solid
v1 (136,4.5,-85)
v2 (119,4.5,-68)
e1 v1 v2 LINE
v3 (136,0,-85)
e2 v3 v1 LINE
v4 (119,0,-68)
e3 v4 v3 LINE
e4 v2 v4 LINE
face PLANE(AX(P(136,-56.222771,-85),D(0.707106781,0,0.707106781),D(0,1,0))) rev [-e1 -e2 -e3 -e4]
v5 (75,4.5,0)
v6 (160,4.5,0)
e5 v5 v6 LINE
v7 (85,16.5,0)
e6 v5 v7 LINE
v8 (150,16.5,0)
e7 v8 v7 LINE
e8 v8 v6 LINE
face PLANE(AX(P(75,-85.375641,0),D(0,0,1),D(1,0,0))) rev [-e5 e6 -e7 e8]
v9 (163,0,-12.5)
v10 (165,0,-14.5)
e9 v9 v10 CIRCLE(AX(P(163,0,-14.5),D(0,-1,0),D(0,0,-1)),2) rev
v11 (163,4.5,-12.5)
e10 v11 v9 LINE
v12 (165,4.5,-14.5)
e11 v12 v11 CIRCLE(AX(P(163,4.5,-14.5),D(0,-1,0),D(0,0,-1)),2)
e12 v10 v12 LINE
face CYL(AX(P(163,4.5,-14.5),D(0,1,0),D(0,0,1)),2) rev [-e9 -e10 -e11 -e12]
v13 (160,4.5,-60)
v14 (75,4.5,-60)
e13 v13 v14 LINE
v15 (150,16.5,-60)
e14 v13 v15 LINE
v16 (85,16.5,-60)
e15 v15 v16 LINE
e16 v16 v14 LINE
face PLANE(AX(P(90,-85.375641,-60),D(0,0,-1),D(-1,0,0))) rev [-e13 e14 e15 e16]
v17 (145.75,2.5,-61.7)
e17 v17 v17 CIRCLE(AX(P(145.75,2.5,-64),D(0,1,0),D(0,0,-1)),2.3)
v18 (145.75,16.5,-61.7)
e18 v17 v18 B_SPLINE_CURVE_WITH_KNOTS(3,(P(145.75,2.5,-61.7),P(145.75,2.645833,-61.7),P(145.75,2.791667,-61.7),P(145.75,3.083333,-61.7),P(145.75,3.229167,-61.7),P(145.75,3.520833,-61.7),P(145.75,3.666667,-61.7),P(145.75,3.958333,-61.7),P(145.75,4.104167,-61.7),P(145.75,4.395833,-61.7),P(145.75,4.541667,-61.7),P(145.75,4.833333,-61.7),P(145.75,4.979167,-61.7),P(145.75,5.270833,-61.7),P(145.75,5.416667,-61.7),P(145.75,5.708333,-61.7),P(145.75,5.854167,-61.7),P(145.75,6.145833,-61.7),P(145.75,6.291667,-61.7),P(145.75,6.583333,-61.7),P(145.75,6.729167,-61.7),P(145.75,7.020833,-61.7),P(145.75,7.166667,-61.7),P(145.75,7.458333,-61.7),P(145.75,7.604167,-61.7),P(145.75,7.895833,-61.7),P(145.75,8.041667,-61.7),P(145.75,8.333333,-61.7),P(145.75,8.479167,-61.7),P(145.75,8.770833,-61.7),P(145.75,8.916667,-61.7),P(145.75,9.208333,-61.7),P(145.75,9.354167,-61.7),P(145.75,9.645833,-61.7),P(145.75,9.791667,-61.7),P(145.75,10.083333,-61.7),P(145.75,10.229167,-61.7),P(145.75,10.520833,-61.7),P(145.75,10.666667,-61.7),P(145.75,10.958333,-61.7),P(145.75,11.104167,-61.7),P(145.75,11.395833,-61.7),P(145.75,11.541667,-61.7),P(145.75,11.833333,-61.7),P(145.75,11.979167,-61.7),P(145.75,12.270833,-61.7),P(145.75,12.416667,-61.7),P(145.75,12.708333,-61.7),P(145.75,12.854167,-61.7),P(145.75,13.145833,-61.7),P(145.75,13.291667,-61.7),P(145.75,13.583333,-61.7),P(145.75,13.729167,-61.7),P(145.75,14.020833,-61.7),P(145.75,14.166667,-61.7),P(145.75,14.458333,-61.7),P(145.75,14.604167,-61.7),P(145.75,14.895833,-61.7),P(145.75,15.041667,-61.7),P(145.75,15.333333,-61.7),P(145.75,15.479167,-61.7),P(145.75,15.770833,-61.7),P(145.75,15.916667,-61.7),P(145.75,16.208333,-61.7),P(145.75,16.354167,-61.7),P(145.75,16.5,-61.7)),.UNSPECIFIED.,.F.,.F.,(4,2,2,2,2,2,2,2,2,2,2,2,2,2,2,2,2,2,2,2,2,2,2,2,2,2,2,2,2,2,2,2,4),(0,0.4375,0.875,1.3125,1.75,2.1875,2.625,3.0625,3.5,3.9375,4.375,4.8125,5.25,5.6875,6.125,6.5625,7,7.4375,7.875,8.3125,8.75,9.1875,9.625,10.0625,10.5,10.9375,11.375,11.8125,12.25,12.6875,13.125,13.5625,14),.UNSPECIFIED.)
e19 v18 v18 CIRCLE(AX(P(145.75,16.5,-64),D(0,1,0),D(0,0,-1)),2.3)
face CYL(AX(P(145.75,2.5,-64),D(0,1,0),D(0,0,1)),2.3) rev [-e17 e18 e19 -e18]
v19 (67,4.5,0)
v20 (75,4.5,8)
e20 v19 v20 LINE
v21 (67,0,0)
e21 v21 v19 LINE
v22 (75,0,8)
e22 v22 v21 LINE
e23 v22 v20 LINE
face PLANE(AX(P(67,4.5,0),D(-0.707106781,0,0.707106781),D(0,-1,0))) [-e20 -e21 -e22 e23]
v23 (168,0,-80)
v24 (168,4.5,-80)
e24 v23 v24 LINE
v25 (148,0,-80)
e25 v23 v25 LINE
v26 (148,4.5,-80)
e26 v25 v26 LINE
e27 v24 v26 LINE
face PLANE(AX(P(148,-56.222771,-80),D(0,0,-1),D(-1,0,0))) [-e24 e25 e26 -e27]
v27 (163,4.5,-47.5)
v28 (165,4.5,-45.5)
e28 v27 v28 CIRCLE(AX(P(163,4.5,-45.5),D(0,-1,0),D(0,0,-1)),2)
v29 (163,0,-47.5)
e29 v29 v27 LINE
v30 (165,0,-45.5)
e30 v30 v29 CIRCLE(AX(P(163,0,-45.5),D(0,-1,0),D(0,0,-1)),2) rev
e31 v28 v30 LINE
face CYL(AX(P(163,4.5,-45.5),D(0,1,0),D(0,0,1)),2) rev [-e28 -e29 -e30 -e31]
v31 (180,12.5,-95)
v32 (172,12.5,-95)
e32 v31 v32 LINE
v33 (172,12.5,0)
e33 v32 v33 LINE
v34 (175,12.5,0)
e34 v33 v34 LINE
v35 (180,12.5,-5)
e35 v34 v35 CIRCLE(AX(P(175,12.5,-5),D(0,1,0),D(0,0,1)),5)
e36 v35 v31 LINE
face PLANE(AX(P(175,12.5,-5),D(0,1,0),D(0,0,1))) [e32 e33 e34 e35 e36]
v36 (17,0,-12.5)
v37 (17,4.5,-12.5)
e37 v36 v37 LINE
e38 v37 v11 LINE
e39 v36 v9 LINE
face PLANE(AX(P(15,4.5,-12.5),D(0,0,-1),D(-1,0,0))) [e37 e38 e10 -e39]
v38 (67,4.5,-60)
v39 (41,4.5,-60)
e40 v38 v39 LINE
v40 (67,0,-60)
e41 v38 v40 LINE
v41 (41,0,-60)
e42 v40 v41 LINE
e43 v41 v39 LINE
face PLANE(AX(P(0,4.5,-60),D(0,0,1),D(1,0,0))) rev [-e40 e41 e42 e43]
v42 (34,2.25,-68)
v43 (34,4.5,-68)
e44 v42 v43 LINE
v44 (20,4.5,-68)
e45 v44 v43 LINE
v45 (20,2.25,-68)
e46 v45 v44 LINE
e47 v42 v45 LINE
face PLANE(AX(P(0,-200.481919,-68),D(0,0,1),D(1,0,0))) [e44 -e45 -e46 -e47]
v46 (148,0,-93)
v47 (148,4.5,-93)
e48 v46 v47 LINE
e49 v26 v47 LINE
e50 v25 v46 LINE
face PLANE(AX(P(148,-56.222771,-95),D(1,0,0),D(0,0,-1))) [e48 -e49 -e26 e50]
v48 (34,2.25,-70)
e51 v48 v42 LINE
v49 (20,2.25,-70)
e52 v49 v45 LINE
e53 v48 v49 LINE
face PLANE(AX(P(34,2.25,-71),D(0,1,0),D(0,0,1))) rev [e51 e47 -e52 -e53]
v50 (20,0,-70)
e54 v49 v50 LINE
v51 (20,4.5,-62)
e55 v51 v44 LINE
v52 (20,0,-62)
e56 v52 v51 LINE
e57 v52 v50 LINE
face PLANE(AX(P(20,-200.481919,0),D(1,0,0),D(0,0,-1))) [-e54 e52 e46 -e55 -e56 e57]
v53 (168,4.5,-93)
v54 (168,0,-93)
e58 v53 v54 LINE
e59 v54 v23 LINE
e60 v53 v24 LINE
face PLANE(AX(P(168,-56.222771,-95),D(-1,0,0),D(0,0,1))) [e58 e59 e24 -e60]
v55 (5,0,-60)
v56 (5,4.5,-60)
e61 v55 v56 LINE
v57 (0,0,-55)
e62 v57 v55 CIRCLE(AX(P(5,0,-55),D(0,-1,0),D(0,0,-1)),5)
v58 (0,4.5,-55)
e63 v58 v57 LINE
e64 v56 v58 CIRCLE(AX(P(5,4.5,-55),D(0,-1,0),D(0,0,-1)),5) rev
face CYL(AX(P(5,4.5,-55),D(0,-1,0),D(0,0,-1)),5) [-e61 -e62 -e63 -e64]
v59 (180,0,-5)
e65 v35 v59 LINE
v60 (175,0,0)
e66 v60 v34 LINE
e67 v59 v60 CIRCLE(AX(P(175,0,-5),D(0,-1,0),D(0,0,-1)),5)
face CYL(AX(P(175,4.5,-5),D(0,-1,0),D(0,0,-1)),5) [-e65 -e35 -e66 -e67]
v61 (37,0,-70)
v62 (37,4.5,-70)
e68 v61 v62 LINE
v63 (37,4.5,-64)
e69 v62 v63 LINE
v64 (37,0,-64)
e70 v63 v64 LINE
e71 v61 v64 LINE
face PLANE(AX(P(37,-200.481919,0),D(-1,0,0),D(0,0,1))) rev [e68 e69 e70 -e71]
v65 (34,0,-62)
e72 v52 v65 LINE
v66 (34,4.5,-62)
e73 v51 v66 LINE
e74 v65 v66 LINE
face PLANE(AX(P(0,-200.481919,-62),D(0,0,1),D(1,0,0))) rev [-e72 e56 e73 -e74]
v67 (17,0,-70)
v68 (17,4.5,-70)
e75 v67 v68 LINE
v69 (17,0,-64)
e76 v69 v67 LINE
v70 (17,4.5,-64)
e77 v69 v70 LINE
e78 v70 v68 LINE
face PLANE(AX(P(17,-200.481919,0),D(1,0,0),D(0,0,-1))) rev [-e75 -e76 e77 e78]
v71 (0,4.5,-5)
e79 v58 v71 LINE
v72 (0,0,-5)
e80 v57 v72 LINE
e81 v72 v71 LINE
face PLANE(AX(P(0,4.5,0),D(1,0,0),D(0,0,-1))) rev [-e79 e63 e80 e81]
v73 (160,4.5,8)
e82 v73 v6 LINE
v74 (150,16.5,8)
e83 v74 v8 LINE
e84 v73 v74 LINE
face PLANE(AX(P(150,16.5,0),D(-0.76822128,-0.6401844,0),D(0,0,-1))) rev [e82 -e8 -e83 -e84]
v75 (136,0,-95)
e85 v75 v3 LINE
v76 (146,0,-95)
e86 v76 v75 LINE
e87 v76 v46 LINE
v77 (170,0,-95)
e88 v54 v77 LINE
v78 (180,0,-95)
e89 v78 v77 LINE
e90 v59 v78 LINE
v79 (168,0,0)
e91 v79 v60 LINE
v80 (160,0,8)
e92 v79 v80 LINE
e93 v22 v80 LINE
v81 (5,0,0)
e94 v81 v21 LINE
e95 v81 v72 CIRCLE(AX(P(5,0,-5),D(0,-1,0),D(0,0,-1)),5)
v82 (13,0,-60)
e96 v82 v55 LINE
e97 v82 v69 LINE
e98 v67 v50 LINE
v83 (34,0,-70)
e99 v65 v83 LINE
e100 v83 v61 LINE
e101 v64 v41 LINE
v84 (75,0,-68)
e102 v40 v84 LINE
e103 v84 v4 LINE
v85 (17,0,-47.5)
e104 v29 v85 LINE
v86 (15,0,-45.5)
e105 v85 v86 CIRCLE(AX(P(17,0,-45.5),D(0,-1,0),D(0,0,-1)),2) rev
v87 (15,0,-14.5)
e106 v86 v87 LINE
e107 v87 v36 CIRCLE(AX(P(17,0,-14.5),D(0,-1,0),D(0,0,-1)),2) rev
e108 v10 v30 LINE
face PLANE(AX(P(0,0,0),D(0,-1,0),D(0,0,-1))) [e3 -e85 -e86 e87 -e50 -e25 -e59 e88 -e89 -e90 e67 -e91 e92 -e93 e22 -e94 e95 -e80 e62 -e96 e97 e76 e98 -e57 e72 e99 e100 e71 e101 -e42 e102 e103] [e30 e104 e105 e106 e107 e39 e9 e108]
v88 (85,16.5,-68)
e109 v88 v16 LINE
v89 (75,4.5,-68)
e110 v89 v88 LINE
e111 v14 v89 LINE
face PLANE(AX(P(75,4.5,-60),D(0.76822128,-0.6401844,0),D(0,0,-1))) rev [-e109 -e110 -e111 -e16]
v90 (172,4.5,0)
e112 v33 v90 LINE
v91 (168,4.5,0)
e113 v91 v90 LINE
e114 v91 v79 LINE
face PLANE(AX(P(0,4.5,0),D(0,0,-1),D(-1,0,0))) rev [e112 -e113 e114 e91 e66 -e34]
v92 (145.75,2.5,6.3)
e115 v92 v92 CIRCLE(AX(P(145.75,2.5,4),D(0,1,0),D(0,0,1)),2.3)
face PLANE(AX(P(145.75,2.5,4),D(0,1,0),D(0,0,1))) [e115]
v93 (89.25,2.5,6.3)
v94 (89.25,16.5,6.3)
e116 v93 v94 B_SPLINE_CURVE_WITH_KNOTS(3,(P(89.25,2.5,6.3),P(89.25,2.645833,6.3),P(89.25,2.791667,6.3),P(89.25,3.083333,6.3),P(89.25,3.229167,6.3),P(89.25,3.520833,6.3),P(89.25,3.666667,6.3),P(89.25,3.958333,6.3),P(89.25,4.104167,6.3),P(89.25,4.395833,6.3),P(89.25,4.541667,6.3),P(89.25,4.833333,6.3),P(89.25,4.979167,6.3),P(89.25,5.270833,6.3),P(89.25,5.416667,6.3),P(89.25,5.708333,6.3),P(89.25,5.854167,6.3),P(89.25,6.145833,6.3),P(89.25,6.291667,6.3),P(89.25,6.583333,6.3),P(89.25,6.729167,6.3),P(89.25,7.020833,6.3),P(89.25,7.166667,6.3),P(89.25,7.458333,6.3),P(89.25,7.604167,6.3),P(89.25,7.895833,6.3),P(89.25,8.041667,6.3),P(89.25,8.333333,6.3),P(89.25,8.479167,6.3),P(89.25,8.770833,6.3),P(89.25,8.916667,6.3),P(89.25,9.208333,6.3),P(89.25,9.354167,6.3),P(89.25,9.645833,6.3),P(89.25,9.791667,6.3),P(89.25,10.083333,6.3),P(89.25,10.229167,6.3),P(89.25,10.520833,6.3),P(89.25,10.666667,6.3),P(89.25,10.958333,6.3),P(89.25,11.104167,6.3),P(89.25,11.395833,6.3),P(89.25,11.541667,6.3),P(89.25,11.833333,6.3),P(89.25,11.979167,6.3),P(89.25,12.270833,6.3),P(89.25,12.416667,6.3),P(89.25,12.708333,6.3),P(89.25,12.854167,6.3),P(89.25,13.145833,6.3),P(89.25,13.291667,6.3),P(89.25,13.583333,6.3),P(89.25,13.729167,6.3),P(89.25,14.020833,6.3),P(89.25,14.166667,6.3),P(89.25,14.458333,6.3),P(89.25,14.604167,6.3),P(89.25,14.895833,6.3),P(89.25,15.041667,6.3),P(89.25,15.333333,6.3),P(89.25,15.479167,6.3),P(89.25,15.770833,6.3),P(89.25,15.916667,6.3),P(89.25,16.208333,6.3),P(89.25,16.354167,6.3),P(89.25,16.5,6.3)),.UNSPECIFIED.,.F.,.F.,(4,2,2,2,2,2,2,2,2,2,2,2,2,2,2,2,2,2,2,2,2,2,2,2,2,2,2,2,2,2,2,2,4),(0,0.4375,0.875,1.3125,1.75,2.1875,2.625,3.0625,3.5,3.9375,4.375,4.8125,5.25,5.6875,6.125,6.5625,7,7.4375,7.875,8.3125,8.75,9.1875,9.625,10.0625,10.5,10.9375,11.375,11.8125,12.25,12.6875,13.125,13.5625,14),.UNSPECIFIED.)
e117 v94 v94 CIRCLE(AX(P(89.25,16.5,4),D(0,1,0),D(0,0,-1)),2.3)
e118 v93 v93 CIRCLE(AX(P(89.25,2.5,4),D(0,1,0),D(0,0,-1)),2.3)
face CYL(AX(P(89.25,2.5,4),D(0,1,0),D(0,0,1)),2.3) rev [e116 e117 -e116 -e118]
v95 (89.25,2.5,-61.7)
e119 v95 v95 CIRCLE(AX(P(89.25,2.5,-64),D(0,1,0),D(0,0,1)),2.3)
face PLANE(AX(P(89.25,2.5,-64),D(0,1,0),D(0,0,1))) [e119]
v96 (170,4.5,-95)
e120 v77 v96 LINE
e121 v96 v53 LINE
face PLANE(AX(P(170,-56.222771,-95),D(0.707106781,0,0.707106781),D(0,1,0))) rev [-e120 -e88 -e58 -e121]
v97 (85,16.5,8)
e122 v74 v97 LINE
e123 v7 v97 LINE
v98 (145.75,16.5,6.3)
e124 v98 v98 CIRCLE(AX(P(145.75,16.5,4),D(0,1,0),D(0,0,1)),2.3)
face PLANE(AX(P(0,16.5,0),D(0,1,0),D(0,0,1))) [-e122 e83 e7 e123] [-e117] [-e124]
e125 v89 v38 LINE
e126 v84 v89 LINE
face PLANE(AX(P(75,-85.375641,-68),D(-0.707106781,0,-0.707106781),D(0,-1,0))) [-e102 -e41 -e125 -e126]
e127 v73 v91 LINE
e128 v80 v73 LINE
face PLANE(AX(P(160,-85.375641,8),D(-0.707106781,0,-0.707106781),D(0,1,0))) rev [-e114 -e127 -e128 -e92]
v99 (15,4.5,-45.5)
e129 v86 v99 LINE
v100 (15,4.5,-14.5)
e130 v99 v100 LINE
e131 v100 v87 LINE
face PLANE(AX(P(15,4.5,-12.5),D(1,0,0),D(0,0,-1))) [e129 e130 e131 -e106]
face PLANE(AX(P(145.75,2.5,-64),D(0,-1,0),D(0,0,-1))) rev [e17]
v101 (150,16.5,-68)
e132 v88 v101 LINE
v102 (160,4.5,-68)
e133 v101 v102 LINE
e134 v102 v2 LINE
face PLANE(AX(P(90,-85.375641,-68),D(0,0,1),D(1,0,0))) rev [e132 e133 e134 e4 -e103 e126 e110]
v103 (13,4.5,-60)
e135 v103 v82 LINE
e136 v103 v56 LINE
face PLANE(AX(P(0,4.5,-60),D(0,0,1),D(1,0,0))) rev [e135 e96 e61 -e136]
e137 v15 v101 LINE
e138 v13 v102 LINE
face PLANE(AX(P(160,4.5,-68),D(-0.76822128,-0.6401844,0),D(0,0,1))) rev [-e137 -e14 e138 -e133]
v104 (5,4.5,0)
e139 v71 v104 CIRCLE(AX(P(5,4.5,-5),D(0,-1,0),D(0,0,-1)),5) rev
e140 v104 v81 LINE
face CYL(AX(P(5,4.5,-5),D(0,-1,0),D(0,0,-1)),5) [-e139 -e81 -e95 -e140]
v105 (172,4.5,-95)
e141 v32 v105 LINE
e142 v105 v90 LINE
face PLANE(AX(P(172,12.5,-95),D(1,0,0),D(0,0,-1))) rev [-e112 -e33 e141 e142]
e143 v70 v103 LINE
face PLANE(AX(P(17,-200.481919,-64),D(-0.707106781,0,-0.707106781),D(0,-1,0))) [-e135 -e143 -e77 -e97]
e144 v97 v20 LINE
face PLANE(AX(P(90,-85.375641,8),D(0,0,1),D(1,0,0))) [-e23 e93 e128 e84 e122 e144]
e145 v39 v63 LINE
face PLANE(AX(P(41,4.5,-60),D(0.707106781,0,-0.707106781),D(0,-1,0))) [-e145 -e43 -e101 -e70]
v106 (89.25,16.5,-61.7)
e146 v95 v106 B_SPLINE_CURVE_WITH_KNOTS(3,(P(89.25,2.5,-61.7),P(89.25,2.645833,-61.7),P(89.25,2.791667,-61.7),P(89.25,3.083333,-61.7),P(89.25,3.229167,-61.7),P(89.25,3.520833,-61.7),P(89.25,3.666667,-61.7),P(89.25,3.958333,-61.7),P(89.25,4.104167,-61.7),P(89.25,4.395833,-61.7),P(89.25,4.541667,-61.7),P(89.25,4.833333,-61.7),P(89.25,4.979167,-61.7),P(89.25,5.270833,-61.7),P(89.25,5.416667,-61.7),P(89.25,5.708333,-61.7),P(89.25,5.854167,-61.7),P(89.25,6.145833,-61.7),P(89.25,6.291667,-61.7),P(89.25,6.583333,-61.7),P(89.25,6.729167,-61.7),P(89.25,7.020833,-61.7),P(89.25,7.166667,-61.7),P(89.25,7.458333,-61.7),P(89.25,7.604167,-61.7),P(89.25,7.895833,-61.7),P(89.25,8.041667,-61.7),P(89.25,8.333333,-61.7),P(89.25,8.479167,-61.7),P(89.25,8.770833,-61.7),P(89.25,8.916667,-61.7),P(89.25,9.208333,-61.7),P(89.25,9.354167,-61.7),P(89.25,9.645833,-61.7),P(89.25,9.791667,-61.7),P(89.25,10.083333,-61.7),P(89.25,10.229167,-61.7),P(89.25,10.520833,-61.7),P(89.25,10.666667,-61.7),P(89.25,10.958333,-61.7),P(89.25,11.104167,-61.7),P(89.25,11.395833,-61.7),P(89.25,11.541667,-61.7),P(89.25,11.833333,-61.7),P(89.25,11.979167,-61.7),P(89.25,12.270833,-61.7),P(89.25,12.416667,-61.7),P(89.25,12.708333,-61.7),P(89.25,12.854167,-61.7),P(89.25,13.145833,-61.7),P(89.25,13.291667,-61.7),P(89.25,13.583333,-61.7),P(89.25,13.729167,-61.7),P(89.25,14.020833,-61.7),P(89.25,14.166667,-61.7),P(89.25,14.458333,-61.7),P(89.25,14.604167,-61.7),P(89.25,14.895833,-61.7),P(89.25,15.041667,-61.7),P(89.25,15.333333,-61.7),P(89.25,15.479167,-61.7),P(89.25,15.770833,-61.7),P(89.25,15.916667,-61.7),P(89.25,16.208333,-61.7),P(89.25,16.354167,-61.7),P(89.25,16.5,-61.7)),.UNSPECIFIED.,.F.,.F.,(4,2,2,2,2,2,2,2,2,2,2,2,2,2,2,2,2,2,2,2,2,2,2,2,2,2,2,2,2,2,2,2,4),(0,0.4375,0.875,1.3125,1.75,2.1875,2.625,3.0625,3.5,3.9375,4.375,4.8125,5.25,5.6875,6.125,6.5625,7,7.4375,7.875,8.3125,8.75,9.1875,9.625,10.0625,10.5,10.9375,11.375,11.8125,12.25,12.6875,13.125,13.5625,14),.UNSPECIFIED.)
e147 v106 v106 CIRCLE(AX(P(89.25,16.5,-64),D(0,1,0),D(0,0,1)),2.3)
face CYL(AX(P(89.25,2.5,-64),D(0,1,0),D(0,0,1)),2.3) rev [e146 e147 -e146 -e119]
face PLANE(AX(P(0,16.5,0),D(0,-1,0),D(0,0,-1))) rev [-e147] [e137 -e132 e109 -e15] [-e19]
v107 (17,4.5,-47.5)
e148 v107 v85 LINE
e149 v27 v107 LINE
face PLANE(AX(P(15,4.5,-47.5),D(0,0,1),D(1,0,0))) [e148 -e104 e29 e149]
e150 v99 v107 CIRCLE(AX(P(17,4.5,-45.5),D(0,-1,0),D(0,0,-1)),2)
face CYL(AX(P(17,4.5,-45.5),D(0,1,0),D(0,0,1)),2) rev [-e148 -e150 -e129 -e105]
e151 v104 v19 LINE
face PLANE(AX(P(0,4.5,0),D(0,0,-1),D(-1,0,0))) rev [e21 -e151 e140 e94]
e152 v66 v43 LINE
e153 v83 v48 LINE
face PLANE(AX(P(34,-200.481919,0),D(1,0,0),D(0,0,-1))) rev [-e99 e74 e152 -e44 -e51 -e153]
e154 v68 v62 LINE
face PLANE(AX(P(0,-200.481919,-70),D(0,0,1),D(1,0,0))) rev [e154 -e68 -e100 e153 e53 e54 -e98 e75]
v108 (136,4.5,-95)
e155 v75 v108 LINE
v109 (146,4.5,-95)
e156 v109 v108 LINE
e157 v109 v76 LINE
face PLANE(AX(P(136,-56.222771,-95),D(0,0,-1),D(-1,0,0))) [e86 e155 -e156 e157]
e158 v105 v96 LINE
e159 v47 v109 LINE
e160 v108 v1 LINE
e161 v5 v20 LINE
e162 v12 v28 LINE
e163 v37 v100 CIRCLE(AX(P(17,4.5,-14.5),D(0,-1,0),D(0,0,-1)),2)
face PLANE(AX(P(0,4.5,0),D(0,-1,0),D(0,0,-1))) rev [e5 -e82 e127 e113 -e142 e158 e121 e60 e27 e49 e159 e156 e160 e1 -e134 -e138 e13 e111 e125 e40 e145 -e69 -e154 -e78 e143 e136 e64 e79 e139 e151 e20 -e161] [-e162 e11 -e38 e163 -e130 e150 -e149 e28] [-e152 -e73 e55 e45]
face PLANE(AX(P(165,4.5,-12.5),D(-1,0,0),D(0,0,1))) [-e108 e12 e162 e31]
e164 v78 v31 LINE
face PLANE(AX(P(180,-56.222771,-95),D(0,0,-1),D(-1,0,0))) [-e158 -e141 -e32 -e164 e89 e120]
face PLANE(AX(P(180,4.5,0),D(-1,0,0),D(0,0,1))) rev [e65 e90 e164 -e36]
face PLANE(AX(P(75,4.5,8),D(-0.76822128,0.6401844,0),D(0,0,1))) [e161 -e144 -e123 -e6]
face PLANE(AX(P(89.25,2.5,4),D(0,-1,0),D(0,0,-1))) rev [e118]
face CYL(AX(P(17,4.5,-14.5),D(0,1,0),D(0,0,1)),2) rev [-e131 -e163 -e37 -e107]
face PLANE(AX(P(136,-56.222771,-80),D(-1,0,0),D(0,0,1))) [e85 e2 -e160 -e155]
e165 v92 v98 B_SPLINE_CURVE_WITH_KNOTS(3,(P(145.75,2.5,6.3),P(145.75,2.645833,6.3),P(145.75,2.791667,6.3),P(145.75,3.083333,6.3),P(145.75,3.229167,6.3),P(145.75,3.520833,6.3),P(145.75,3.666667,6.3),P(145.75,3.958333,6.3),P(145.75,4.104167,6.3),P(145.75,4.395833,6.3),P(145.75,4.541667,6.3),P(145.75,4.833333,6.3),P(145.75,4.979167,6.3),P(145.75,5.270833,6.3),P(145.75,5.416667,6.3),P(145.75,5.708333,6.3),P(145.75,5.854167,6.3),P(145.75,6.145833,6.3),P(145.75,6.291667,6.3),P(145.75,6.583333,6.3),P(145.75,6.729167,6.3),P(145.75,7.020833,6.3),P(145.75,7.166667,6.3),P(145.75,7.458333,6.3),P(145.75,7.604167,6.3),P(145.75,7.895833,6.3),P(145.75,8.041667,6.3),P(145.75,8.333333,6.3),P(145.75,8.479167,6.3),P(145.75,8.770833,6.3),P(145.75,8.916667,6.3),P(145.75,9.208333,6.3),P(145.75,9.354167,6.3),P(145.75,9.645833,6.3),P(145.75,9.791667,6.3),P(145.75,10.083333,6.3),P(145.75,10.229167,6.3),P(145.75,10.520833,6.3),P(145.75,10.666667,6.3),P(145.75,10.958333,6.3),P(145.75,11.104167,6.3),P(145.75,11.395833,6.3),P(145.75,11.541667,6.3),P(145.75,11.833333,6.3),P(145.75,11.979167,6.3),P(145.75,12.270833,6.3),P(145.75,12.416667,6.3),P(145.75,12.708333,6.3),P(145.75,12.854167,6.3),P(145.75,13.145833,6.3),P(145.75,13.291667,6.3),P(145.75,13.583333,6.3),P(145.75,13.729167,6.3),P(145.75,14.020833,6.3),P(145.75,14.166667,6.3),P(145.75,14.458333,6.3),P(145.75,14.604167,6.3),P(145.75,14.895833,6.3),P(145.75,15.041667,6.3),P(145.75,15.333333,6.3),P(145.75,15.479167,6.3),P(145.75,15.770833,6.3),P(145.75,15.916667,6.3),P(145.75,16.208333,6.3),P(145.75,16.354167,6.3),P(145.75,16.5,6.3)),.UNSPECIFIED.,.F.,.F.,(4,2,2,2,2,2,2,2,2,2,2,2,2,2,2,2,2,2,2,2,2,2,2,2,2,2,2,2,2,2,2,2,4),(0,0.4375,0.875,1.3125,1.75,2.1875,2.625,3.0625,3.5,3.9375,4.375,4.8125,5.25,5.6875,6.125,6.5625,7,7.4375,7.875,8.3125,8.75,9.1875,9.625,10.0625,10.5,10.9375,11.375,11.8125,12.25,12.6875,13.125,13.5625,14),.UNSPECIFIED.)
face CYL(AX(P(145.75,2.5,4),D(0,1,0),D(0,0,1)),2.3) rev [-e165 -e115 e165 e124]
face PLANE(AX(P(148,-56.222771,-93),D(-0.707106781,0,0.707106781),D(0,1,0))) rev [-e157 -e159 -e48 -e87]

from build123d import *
from OCP.BRepFilletAPI import BRepFilletAPI_MakeChamfer

# Parameters (mm, degrees)
SKETCH1_W                       = 180
SKETCH1_H                       = 60
SKETCH1_W_2                     = 150
SKETCH1_H_2                     = 35
BOSS_EXTRUDE1_DEPTH             = 4.5
FILLET1_R                       = 5
FILLET2_R                       = 2
BOSS_EXTRUDE2_DEPTH             = 4.5
CHAMFER1_SIZE                   = 25
CHAMFER2_SIZE                   = 2
BOSS_EXTRUDE3_DEPTH             = 12
BOSS_EXTRUDE3_DIRECTION_2_REACH = 205.581
CHAMFER3_SIZE                   = 10
CHAMFER3_SIZE_2                 = 12
CHAMFER4_SIZE                   = 8
BOSS_EXTRUDE4_START             = 8
BOSS_EXTRUDE4_DEPTH             = 8
SKETCH5_R                       = 2.3
CUT_EXTRUDE1_DEPTH              = 14
CHAMFER5_SIZE                   = 12
CHAMFER5_SIZE2                  = 10
SKETCH6_W                       = 20
SKETCH6_H                       = 10
SKETCH6_W_2                     = 14
SKETCH6_H_2                     = 6
BOSS_EXTRUDE5_DEPTH             = 4.5
CHAMFER6_SIZE                   = 4
SKETCH7_W                       = 14
SKETCH7_H                       = 2.25
CUT_EXTRUDE2_DEPTH              = 3


with BuildPart() as part:
    # Sketch1 → Boss-Extrude1 (new body)
    with BuildSketch(Plane(origin=(0, 0, 0), x_dir=(1, 0, 0), z_dir=(0, 1, 0))):
        with Locations((90, 30)):
            Rectangle(SKETCH1_W, SKETCH1_H)
        with Locations((90, 30)):
            Rectangle(SKETCH1_W_2, SKETCH1_H_2, mode=Mode.SUBTRACT)
    extrude(amount=BOSS_EXTRUDE1_DEPTH)

    # Fillet1
    fillet1_edges = [part.edges().sort_by_distance(p)[0] for p in [
        (0, 2.25, -60),
        (180, 2.25, 0),
        (0, 2.25, 0),
    ]]
    fillet(fillet1_edges, radius=FILLET1_R)

    # Fillet2
    fillet2_edges = [part.edges().sort_by_distance(p)[0] for p in [
        (165, 2.25, -12.5),
        (165, 2.25, -47.5),
        (15, 2.25, -47.5),
        (15, 2.25, -12.5),
    ]]
    fillet(fillet2_edges, radius=FILLET2_R)

    # Sketch2 → Boss-Extrude2 (add)
    with BuildSketch(Plane(origin=(0, 4.5, 0), x_dir=(1, 0, 0), z_dir=(0, 1, 0))):
        Polygon((180, 80), (180, 60), (136, 60), (136, 80), (136, 95), (148, 95), (148, 80), (168, 80), (168, 95), (180, 95), align=None)
    extrude(amount=-BOSS_EXTRUDE2_DEPTH)

    # Chamfer1
    chamfer1_edges = [part.edges().sort_by_distance(p)[0] for p in [
        (136, 2.25, -60),
    ]]
    chamfer(chamfer1_edges, length=CHAMFER1_SIZE)

    # Chamfer2
    chamfer2_edges = [part.edges().sort_by_distance(p)[0] for p in [
        (168, 2.25, -95),
        (148, 2.25, -95),
    ]]
    chamfer(chamfer2_edges, length=CHAMFER2_SIZE)

    # Sketch3 → Boss-Extrude3 (add)
    with BuildSketch(Plane(origin=(0, 4.5, 0), x_dir=(1, 0, 0), z_dir=(0, 1, 0))):
        Polygon((90, -8), (160, -8), (160, 0), (90, 0), (75, 0), (75, -8), align=None)
        Polygon((160, 60), (90, 60), (75, 60), (75, 68), (90, 68), (160, 68), align=None)
    extrude(amount=BOSS_EXTRUDE3_DEPTH)

    # Boss-Extrude3 direction 2: up to this face of the body (flat: up to its plane)
    boss_extrude3_direction_2_end = Plane(part.part.faces().sort_by_distance((141, 0, -92.964686756))[0])
    # Sketch3 → Boss-Extrude3 direction 2 (add, up to the picked face)
    with BuildSketch(Plane(origin=(0, 4.5, 0), x_dir=(1, 0, 0), z_dir=(0, 1, 0)), mode=Mode.PRIVATE) as boss_extrude3_direction_2_sk1:
        Polygon((90, -8), (160, -8), (160, 0), (90, 0), (75, 0), (75, -8), align=None)
    boss_extrude3_direction_2_tool1 = split(extrude(boss_extrude3_direction_2_sk1.sketch, amount=-BOSS_EXTRUDE3_DIRECTION_2_REACH, mode=Mode.PRIVATE), bisect_by=boss_extrude3_direction_2_end, keep=Keep.BOTH, mode=Mode.PRIVATE)
    # Sketch3 → Boss-Extrude3 direction 2 (add, up to the picked face)
    with BuildSketch(Plane(origin=(0, 4.5, 0), x_dir=(1, 0, 0), z_dir=(0, 1, 0)), mode=Mode.PRIVATE) as boss_extrude3_direction_2_sk2:
        Polygon((160, 60), (90, 60), (75, 60), (75, 68), (90, 68), (160, 68), align=None)
    boss_extrude3_direction_2_tool2 = split(extrude(boss_extrude3_direction_2_sk2.sketch, amount=-BOSS_EXTRUDE3_DIRECTION_2_REACH, mode=Mode.PRIVATE), bisect_by=boss_extrude3_direction_2_end, keep=Keep.BOTH, mode=Mode.PRIVATE)
    add(boss_extrude3_direction_2_tool1.solids().sort_by(Axis((117.5, 4.5, 4), (0, -1, 0)))[0])
    add(boss_extrude3_direction_2_tool2.solids().sort_by(Axis((117.5, 4.5, -64), (0, -1, 0)))[0])

    # Chamfer3
    chamfer3_edges_1 = [part.edges().sort_by_distance(p)[0] for p in [
        (160, 16.5, -64),
    ]]
    chamfer3_side_1 = [part.faces().sort_by_distance(p)[0] for p in [
        (159.8, 16.5, -64),
    ]]
    chamfer3_edges_2 = [part.edges().sort_by_distance(p)[0] for p in [
        (75, 16.5, -64),
    ]]
    chamfer3_side_2 = [part.faces().sort_by_distance(p)[0] for p in [
        (75.2, 16.5, -64),
    ]]
    chamfer3_edges_3 = [part.edges().sort_by_distance(p)[0] for p in [
        (75, 16.5, 4),
    ]]
    chamfer3_side_3 = [part.faces().sort_by_distance(p)[0] for p in [
        (75.2, 16.5, 4),
    ]]
    chamfer3 = BRepFilletAPI_MakeChamfer(part.part.solid().wrapped)
    for e in chamfer3_edges_1:
        chamfer3.Add(CHAMFER3_SIZE - 0.0001, CHAMFER3_SIZE_2 - 0.0001, e.wrapped, chamfer3_side_1[0].wrapped)
    for e in chamfer3_edges_2:
        chamfer3.Add(CHAMFER3_SIZE - 0.0001, CHAMFER3_SIZE_2 - 0.0001, e.wrapped, chamfer3_side_2[0].wrapped)
    for e in chamfer3_edges_3:
        chamfer3.Add(CHAMFER3_SIZE - 0.0001, CHAMFER3_SIZE_2 - 0.0001, e.wrapped, chamfer3_side_3[0].wrapped)
    add(Compound.cast(chamfer3.Shape()), mode=Mode.REPLACE)  # a hair under: the kernel refuses the full size

    # Chamfer4
    chamfer4_edges = [part.edges().sort_by_distance(p)[0] for p in [
        (160, 2.25, 0),
        (75, 2.25, 0),
        (75, 2.25, -60),
    ]]
    chamfer(chamfer4_edges, length=CHAMFER4_SIZE - 0.0001)  # a hair under: the kernel refuses the full size

    # Sketch4 → Boss-Extrude4 (add)
    with BuildSketch(Plane(origin=(0, 4.5, 0), x_dir=(1, 0, 0), z_dir=(0, 1, 0)).offset(BOSS_EXTRUDE4_START)):
        with BuildLine():
            Line((180, 95), (180, 5))
            ThreePointArc((180, 5), (178.535533906, 1.464466094), (175, 0))
            Line((175, 0), (172, 0))
            Line((172, 0), (172, 95))
            Line((172, 95), (180, 95))
        make_face()
    extrude(amount=-BOSS_EXTRUDE4_DEPTH)

    # Sketch5 → Cut-Extrude1 (cut)
    with BuildSketch(Plane(origin=(0, 16.5, 0), x_dir=(1, 0, 0), z_dir=(0, 1, 0))):
        with Locations(Location((89.25, 64, 0), (0, 0, 270))):
            Circle(SKETCH5_R)
        with Locations(Location((145.75, 64, 0), (0, 0, 270))):
            Circle(SKETCH5_R)
        with Locations(Location((145.75, -4, 0), (0, 0, 270))):
            Circle(SKETCH5_R)
        with Locations(Location((89.25, -4, 0), (0, 0, 270))):
            Circle(SKETCH5_R)
    extrude(amount=-CUT_EXTRUDE1_DEPTH, mode=Mode.SUBTRACT)

    # Chamfer5
    chamfer5_edges = [part.edges().sort_by_distance(p)[0] for p in [
        (160, 16.5, 4),
    ]]
    chamfer5_side = [part.faces().sort_by_distance(p)[0] for p in [
        (160, 10.499961328, 4.00001875),
    ]]
    chamfer(chamfer5_edges, length=CHAMFER5_SIZE, length2=CHAMFER5_SIZE2, reference=chamfer5_side[0])

    # Sketch6 → Boss-Extrude5 (add)
    # profile 1 of 2: a face of its own
    with BuildSketch(Plane(origin=(0, 4.5, 0), x_dir=(1, 0, 0), z_dir=(0, 1, 0))):
        with Locations((27, 65)):
            Rectangle(SKETCH6_W, SKETCH6_H)
        with Locations((27, 65)):
            Rectangle(SKETCH6_W_2, SKETCH6_H_2, mode=Mode.SUBTRACT)
    # profile 2 of 2: a face of its own
    with BuildSketch(Plane(origin=(0, 4.5, 0), x_dir=(1, 0, 0), z_dir=(0, 1, 0))):
        with BuildLine():
            Line((168, 0), (172, 0))
            Line((172, 0), (172, 95))
            Line((172, 95), (170, 95))
            Line((170, 95), (168, 93))
            Line((168, 93), (168, 80))
            Line((168, 80), (148, 80))
            Line((148, 80), (148, 93))
            Line((148, 93), (146, 95))
            Line((146, 95), (136, 95))
            Line((136, 95), (136, 85))
            Line((136, 85), (119, 68))
            Line((119, 68), (160, 68))
            Line((160, 68), (160, 60))
            Line((160, 60), (75, 60))
            Line((75, 60), (75, 68))
            Line((75, 68), (67, 60))
            Line((67, 60), (5, 60))
            ThreePointArc((5, 60), (1.464466094, 58.535533906), (0, 55))
            Line((0, 55), (0, 5))
            ThreePointArc((0, 5), (1.464466094, 1.464466094), (5, 0))
            Line((5, 0), (67, 0))
            Line((67, 0), (75, -8))
            Line((75, -8), (75, 0))
            Line((75, 0), (160, 0))
            Line((160, 0), (160, -8))
            Line((160, -8), (168, 0))
        make_face()
        with BuildLine():
            ThreePointArc((163, 47.5), (164.414213562, 46.914213562), (165, 45.5))
            Line((165, 45.5), (165, 14.5))
            ThreePointArc((165, 14.5), (164.414213562, 13.085786438), (163, 12.5))
            Line((163, 12.5), (17, 12.5))
            ThreePointArc((17, 12.5), (15.585786438, 13.085786438), (15, 14.5))
            Line((15, 14.5), (15, 45.5))
            ThreePointArc((15, 45.5), (15.585786438, 46.914213562), (17, 47.5))
            Line((17, 47.5), (163, 47.5))
        make_face(mode=Mode.SUBTRACT)
    extrude(amount=-BOSS_EXTRUDE5_DEPTH)

    # Chamfer6
    chamfer6_edges = [part.edges().sort_by_distance(p)[0] for p in [
        (17, 2.25, -60),
        (37, 2.25, -60),
    ]]
    chamfer(chamfer6_edges, length=CHAMFER6_SIZE)

    # Sketch7 → Cut-Extrude2 (cut)
    with BuildSketch(Plane.XY.offset(-68)):
        with Locations((27, 1.125)):
            Rectangle(SKETCH7_W, SKETCH7_H)
    extrude(amount=-CUT_EXTRUDE2_DEPTH, mode=Mode.SUBTRACT)


solid = part.part
